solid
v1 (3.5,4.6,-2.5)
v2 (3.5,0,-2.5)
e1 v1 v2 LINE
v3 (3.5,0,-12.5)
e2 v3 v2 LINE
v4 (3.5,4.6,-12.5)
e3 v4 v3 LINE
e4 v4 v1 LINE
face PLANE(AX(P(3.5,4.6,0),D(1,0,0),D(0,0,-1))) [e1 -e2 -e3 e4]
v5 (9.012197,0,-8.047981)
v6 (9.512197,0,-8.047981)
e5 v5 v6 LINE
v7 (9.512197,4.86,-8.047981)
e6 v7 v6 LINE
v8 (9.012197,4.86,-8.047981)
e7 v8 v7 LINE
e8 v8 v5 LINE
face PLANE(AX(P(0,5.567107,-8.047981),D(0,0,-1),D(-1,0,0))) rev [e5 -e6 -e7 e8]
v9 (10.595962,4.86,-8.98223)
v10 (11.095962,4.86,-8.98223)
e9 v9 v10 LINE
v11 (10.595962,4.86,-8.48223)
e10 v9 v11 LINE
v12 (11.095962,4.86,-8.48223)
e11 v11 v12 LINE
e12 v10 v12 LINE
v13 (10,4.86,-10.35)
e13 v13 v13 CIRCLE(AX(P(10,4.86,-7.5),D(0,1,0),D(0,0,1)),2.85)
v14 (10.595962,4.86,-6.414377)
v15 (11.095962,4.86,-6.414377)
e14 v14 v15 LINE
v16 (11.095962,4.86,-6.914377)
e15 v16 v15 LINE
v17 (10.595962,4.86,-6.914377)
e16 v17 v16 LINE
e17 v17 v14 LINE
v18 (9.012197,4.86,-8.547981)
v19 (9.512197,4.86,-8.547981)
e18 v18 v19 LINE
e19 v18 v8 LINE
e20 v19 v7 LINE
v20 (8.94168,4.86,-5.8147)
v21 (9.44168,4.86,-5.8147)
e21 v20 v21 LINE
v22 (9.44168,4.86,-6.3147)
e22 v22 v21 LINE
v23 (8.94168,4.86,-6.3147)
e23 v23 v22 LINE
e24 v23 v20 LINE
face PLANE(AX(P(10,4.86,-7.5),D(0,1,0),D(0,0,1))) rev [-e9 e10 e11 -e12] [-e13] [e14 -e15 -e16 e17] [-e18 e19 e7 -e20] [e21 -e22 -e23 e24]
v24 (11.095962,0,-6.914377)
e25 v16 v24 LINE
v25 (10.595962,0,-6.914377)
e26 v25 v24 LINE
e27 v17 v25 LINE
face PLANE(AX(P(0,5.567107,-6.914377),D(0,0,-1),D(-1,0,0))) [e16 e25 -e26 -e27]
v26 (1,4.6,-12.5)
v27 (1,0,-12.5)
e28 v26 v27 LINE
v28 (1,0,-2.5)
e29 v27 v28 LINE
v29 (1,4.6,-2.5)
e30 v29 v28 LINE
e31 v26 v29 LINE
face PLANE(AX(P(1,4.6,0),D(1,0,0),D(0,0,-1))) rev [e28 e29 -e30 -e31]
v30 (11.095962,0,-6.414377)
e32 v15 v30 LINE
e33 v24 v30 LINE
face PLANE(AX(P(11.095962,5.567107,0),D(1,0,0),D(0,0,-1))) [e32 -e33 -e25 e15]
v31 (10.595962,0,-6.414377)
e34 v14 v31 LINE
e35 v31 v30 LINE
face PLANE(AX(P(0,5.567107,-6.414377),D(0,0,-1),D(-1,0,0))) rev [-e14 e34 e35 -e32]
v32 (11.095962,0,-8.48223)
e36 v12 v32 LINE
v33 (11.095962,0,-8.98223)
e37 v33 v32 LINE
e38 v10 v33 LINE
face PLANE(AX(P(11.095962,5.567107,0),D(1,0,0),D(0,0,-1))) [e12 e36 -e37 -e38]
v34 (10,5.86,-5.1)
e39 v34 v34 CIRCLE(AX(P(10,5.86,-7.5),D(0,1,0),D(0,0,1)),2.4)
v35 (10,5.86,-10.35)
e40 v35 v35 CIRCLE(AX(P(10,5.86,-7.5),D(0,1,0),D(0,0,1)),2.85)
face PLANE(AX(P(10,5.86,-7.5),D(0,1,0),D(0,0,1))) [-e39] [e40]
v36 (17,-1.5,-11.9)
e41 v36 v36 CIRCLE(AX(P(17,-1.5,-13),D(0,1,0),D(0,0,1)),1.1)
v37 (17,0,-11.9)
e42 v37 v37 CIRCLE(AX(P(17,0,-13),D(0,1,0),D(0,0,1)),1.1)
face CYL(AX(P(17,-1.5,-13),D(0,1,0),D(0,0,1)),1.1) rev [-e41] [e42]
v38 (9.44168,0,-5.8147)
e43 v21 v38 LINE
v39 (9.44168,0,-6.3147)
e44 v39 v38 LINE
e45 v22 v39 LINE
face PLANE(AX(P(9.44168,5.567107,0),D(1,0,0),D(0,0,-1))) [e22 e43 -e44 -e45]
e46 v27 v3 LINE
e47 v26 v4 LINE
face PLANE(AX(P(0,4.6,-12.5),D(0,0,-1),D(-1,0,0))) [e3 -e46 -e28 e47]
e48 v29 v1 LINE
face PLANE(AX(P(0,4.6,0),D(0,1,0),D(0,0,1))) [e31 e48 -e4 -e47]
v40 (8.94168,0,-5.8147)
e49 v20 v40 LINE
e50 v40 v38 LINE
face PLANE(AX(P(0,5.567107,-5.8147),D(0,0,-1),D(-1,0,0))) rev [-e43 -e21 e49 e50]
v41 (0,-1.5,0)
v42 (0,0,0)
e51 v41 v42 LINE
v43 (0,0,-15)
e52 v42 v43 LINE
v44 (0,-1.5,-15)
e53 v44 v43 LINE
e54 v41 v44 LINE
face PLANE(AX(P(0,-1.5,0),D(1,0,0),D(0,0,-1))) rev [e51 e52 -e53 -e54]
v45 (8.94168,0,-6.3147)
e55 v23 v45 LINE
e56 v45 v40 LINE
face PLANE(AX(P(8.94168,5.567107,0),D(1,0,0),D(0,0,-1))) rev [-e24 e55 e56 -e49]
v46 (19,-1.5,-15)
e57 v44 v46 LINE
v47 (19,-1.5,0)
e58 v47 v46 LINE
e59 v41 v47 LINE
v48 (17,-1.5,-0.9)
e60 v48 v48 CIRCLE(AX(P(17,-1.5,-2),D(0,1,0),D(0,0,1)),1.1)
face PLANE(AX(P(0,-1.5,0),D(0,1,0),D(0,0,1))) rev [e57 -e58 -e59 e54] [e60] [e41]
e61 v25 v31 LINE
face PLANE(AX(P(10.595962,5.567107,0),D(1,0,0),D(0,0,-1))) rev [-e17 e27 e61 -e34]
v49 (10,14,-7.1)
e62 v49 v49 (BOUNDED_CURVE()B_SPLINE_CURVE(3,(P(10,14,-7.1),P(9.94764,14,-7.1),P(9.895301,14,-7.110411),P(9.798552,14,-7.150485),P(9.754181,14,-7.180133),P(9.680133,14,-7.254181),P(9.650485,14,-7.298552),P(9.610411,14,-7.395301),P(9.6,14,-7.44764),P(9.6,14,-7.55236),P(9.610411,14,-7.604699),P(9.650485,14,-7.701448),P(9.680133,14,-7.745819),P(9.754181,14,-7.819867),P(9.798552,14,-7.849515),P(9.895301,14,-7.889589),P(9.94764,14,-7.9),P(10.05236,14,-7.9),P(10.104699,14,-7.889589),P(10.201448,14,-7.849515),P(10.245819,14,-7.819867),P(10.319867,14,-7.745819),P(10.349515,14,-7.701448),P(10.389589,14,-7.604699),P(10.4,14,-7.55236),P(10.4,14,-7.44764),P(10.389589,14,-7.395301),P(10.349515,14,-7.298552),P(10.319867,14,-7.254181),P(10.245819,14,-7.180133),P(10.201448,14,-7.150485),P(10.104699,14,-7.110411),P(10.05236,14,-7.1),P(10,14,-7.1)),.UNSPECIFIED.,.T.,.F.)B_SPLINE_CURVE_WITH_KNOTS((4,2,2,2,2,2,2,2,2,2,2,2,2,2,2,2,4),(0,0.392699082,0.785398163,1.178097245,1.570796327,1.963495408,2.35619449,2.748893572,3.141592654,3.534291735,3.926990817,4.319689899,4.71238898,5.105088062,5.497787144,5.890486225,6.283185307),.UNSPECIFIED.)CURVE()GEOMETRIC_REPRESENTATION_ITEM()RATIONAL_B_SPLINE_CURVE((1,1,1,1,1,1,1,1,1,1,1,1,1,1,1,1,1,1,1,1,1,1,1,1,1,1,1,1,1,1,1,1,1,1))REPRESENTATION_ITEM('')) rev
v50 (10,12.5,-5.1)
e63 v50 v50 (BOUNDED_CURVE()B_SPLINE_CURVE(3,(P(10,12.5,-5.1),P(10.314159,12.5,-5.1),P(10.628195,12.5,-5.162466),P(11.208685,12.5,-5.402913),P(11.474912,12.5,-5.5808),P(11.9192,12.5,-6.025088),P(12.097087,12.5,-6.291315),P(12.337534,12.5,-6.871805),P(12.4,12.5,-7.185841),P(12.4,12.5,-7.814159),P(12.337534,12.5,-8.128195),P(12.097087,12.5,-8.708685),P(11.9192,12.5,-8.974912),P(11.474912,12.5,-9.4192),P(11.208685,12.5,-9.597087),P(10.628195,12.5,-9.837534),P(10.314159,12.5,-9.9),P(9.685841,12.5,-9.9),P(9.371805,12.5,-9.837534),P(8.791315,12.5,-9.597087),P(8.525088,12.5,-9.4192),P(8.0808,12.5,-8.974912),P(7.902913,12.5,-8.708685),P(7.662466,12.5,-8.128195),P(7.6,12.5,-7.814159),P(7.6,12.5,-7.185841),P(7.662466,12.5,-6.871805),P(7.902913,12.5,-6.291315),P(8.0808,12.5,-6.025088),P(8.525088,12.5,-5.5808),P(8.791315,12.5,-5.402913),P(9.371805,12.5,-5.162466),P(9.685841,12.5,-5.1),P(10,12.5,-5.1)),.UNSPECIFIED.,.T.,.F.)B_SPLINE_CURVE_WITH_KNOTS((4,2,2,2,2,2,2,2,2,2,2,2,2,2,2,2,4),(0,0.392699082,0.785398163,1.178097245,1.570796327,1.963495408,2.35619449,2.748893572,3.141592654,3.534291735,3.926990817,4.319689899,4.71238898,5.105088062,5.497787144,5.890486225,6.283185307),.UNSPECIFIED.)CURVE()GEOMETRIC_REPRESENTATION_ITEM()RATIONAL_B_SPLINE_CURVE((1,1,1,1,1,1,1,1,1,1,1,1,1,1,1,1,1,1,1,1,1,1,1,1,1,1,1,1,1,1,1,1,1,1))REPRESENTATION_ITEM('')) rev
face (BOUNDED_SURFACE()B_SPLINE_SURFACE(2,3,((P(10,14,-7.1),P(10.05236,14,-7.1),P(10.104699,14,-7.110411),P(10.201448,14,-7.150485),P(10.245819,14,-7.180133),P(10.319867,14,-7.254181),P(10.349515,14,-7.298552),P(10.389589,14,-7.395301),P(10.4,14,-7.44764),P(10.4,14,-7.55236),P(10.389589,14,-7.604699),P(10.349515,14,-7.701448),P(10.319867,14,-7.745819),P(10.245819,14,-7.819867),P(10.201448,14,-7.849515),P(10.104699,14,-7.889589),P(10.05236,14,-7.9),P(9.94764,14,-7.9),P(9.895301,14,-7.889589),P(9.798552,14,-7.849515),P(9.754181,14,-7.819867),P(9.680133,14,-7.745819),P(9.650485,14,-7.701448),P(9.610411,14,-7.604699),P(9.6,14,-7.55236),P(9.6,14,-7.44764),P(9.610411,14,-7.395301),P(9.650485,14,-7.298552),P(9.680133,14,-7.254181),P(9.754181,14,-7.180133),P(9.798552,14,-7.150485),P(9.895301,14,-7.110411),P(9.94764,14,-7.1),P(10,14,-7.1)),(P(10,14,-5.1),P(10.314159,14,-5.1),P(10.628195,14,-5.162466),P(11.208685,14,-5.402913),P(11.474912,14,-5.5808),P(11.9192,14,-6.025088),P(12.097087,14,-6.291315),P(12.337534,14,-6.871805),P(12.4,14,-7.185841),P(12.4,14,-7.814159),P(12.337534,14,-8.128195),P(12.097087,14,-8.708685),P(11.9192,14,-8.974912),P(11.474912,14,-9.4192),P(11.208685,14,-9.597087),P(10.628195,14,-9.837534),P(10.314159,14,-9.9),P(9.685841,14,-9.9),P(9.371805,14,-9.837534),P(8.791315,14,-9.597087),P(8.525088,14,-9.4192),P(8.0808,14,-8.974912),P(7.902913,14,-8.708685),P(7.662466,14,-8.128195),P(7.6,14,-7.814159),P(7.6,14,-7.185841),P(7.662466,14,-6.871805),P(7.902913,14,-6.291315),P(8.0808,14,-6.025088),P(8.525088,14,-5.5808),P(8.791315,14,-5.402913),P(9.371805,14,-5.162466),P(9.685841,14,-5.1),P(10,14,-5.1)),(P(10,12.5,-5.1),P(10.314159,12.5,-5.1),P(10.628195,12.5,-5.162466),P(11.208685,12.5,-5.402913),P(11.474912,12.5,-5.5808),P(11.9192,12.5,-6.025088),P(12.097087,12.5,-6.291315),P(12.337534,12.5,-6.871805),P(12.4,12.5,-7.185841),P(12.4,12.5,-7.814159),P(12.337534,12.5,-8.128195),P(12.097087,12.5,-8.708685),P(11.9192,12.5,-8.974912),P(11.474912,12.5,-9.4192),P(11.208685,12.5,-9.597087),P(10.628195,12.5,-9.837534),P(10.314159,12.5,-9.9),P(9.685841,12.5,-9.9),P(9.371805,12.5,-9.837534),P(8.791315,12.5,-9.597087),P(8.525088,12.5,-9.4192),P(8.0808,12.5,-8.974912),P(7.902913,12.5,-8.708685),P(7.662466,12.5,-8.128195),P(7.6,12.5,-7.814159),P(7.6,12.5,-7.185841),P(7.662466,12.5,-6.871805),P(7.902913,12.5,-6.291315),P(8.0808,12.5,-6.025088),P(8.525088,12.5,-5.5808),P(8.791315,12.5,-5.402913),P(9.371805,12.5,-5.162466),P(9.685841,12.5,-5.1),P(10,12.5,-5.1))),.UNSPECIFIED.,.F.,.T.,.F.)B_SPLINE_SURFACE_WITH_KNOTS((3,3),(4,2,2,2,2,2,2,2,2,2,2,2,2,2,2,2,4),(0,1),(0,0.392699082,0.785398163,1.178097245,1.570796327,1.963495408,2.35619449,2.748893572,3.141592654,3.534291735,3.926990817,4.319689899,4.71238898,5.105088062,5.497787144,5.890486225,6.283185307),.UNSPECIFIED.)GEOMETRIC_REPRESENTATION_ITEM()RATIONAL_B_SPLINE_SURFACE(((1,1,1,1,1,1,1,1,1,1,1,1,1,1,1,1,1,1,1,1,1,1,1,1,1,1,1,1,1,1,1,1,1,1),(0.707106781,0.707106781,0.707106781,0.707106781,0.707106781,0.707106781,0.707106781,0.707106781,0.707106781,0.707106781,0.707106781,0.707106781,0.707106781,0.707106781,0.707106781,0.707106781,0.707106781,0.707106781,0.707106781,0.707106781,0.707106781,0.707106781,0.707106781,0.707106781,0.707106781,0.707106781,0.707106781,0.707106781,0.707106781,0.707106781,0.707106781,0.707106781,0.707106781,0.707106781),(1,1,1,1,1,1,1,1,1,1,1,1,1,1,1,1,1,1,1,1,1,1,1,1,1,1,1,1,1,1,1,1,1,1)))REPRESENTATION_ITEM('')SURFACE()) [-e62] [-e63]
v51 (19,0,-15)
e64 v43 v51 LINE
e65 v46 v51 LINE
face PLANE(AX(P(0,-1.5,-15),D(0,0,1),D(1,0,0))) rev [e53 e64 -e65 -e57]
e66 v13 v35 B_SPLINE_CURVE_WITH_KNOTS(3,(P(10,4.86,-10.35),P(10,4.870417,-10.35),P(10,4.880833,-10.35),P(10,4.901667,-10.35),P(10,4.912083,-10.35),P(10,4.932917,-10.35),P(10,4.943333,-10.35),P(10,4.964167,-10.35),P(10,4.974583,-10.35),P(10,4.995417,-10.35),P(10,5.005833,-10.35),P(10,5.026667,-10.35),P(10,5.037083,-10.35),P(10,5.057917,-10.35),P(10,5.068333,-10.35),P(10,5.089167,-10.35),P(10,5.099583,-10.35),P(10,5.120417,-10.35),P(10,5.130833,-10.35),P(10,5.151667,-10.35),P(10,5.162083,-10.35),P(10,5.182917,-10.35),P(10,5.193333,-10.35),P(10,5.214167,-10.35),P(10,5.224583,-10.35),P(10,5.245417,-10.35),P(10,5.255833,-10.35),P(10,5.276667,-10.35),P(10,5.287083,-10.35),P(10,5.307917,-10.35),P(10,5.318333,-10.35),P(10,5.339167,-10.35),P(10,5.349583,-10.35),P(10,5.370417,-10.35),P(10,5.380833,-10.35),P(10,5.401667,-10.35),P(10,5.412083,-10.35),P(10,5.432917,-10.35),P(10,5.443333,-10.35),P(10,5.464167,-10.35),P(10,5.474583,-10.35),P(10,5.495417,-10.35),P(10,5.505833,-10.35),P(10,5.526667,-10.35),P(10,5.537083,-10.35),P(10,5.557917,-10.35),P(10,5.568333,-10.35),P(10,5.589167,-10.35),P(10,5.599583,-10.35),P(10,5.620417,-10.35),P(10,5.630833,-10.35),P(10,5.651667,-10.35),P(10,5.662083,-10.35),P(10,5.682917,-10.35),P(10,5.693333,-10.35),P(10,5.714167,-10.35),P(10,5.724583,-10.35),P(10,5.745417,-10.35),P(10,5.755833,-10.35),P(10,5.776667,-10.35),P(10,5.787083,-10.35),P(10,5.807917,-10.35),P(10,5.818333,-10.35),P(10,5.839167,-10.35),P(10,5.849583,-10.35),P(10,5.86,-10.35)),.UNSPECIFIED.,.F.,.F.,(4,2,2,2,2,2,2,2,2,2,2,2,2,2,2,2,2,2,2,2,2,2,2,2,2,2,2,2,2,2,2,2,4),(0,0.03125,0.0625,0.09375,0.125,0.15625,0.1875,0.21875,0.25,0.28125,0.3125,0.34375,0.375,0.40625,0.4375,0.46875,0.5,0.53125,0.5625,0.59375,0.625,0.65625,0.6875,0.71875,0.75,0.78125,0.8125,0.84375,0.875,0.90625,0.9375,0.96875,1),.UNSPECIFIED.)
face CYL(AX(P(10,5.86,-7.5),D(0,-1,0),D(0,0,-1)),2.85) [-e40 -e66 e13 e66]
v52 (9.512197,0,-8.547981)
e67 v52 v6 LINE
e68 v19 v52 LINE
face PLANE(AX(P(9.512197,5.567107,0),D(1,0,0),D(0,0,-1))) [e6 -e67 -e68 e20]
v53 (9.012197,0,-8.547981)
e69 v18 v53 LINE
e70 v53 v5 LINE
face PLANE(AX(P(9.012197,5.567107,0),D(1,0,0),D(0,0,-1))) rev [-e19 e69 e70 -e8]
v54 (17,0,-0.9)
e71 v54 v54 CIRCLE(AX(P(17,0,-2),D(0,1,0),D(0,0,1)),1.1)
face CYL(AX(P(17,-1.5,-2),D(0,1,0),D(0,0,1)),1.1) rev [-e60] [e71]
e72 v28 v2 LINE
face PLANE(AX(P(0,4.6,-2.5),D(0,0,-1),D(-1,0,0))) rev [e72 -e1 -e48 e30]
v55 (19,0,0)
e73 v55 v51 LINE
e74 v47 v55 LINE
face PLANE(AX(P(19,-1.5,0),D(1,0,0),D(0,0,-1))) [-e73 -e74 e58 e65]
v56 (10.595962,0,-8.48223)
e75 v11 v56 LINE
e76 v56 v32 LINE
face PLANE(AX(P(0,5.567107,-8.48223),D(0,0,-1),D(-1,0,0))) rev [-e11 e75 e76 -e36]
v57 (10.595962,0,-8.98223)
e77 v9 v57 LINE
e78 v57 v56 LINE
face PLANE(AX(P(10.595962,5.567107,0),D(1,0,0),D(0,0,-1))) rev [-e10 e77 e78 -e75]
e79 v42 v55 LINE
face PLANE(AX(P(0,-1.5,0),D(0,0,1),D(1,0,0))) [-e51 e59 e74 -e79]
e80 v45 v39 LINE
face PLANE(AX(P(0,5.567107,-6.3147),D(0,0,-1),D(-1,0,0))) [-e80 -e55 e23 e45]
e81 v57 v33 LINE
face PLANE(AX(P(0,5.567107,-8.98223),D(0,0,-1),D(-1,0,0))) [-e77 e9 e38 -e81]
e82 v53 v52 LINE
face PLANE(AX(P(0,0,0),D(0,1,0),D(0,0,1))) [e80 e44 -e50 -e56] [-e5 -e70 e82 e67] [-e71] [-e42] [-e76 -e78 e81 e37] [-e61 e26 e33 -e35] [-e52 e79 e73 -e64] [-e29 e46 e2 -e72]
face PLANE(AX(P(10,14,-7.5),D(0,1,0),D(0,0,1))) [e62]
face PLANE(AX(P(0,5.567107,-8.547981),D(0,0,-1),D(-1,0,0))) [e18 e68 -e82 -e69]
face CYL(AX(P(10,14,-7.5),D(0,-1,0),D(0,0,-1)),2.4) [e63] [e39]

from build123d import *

# Parameters (mm, degrees)
SKETCH_1_W          = 19
SKETCH_1_H          = 15
SKETCH_1_R          = 1.1
EXTRUDE_1_DEPTH     = 1.5
SKETCH_1_4_R        = 2.4
EXTRUDE_2_DEPTH     = 14
SKETCH_1_5_R        = 2.85
EXTRUDE_3_DEPTH     = 5.86
SKETCH_1_7_R        = 2.85
CUT_EXTRUDE_1_DEPTH = 4.86
SKETCH_1_8_W        = 0.5
SKETCH_1_8_H        = 0.5
EXTRUDE_4_DEPTH     = 4.86
FILLET_3_SIZE       = 1.5
FILLET_3_SIZE_2     = 2
SKETCH_1_9_W        = 2.5
SKETCH_1_9_H        = 10
EXTRUDE_5_DEPTH     = 4.6


with BuildPart() as part:
    # 草图1 → 凸台-拉伸1 (new body)
    with BuildSketch(Plane(origin=(0, 0, 0), x_dir=(1, 0, 0), z_dir=(0, 1, 0))):
        with Locations((9.5, 7.5)):
            Rectangle(SKETCH_1_W, SKETCH_1_H)
        with Locations(Location((17, 13, 0), (0, 0, 270))):
            Circle(SKETCH_1_R, mode=Mode.SUBTRACT)
        with Locations(Location((17, 2, 0), (0, 0, 270))):
            Circle(SKETCH_1_R, mode=Mode.SUBTRACT)
    extrude(amount=-EXTRUDE_1_DEPTH)

    # 草图1<4> → 凸台-拉伸2 (add)
    with BuildSketch(Plane(origin=(0, 0, 0), x_dir=(1, 0, 0), z_dir=(0, 1, 0))):
        with Locations(Location((10, 7.5, 0), (0, 0, 270))):
            Circle(SKETCH_1_4_R)
    extrude(amount=EXTRUDE_2_DEPTH)

    # 草图1<5> → 凸台-拉伸3 (add)
    with BuildSketch(Plane(origin=(0, 0, 0), x_dir=(1, 0, 0), z_dir=(0, 1, 0))):
        with Locations(Location((10, 7.5, 0), (0, 0, 90))):
            Circle(SKETCH_1_5_R)
    extrude(amount=EXTRUDE_3_DEPTH)

    # 草图1<7> → 切除-拉伸1 (cut)
    with BuildSketch(Plane(origin=(0, 0, 0), x_dir=(1, 0, 0), z_dir=(0, 1, 0))):
        with Locations(Location((10, 7.5, 0), (0, 0, 90))):
            Circle(SKETCH_1_7_R)
    extrude(amount=CUT_EXTRUDE_1_DEPTH, mode=Mode.SUBTRACT)


with BuildPart() as cut_extrude_1_piece_1:
    # of the separate pieces the step leaves, piece 1, a body of its own (cut_extrude_1_pieces)
    add(part.part.solids().sort_by_distance((0, 0, 0))[0])



with BuildPart() as cut_extrude_1_piece_2:
    # of the separate pieces the step leaves, piece 2, a body of its own (cut_extrude_1_pieces)
    add(part.part.solids().sort_by_distance((10, 4.86, -10.35))[0])


with BuildPart() as cut_extrude_1_piece_1_1:
    add(cut_extrude_1_piece_1.part)

    add(cut_extrude_1_piece_2.part)  # 凸台-拉伸4 merges 切除-拉伸1 piece 2
    # 草图1<8> → 凸台-拉伸4 (add)
    with BuildSketch(Plane(origin=(0, 0, 0), x_dir=(1, 0, 0), z_dir=(0, 1, 0))):
        with Locations((9.262196887, 8.297981086)):
            Rectangle(SKETCH_1_8_W, SKETCH_1_8_H)
        with Locations((9.191679648, 6.064699679)):
            Rectangle(SKETCH_1_8_W, SKETCH_1_8_H)
        with Locations((10.845962172, 6.664377094)):
            Rectangle(SKETCH_1_8_W, SKETCH_1_8_H)
        with Locations((10.845962172, 8.732230249)):
            Rectangle(SKETCH_1_8_W, SKETCH_1_8_H)
    extrude(amount=EXTRUDE_4_DEPTH)

    # 圆角3
    # an asymmetric fillet: 2, 1.5 mm, written as the material it takes off along each edge
    with BuildSketch(Plane(origin=(10, 14, -7.5), x_dir=(0, 0, 1), z_dir=(-1, 0, 0))) as fillet_3_piece_1:
        with BuildLine():
            Bezier((2.4, -FILLET_3_SIZE), (2.4, 0), (2.4 - FILLET_3_SIZE_2, 0), weights=[1, 0.707106781, 1])
            Line((2.4 - FILLET_3_SIZE_2, 0), (2.4, 0))
            Line((2.4, 0), (2.4, -FILLET_3_SIZE))
        make_face()
    revolve(axis=Axis((10, 14, -7.5), (0, 1, 0)), mode=Mode.SUBTRACT)

    # 草图1<9> → 凸台-拉伸5 (add)
    with BuildSketch(Plane(origin=(0, 0, 0), x_dir=(1, 0, 0), z_dir=(0, 1, 0))):
        with Locations((2.25, 7.5)):
            Rectangle(SKETCH_1_9_W, SKETCH_1_9_H)
    extrude(amount=EXTRUDE_5_DEPTH)


solid = cut_extrude_1_piece_1_1.part
